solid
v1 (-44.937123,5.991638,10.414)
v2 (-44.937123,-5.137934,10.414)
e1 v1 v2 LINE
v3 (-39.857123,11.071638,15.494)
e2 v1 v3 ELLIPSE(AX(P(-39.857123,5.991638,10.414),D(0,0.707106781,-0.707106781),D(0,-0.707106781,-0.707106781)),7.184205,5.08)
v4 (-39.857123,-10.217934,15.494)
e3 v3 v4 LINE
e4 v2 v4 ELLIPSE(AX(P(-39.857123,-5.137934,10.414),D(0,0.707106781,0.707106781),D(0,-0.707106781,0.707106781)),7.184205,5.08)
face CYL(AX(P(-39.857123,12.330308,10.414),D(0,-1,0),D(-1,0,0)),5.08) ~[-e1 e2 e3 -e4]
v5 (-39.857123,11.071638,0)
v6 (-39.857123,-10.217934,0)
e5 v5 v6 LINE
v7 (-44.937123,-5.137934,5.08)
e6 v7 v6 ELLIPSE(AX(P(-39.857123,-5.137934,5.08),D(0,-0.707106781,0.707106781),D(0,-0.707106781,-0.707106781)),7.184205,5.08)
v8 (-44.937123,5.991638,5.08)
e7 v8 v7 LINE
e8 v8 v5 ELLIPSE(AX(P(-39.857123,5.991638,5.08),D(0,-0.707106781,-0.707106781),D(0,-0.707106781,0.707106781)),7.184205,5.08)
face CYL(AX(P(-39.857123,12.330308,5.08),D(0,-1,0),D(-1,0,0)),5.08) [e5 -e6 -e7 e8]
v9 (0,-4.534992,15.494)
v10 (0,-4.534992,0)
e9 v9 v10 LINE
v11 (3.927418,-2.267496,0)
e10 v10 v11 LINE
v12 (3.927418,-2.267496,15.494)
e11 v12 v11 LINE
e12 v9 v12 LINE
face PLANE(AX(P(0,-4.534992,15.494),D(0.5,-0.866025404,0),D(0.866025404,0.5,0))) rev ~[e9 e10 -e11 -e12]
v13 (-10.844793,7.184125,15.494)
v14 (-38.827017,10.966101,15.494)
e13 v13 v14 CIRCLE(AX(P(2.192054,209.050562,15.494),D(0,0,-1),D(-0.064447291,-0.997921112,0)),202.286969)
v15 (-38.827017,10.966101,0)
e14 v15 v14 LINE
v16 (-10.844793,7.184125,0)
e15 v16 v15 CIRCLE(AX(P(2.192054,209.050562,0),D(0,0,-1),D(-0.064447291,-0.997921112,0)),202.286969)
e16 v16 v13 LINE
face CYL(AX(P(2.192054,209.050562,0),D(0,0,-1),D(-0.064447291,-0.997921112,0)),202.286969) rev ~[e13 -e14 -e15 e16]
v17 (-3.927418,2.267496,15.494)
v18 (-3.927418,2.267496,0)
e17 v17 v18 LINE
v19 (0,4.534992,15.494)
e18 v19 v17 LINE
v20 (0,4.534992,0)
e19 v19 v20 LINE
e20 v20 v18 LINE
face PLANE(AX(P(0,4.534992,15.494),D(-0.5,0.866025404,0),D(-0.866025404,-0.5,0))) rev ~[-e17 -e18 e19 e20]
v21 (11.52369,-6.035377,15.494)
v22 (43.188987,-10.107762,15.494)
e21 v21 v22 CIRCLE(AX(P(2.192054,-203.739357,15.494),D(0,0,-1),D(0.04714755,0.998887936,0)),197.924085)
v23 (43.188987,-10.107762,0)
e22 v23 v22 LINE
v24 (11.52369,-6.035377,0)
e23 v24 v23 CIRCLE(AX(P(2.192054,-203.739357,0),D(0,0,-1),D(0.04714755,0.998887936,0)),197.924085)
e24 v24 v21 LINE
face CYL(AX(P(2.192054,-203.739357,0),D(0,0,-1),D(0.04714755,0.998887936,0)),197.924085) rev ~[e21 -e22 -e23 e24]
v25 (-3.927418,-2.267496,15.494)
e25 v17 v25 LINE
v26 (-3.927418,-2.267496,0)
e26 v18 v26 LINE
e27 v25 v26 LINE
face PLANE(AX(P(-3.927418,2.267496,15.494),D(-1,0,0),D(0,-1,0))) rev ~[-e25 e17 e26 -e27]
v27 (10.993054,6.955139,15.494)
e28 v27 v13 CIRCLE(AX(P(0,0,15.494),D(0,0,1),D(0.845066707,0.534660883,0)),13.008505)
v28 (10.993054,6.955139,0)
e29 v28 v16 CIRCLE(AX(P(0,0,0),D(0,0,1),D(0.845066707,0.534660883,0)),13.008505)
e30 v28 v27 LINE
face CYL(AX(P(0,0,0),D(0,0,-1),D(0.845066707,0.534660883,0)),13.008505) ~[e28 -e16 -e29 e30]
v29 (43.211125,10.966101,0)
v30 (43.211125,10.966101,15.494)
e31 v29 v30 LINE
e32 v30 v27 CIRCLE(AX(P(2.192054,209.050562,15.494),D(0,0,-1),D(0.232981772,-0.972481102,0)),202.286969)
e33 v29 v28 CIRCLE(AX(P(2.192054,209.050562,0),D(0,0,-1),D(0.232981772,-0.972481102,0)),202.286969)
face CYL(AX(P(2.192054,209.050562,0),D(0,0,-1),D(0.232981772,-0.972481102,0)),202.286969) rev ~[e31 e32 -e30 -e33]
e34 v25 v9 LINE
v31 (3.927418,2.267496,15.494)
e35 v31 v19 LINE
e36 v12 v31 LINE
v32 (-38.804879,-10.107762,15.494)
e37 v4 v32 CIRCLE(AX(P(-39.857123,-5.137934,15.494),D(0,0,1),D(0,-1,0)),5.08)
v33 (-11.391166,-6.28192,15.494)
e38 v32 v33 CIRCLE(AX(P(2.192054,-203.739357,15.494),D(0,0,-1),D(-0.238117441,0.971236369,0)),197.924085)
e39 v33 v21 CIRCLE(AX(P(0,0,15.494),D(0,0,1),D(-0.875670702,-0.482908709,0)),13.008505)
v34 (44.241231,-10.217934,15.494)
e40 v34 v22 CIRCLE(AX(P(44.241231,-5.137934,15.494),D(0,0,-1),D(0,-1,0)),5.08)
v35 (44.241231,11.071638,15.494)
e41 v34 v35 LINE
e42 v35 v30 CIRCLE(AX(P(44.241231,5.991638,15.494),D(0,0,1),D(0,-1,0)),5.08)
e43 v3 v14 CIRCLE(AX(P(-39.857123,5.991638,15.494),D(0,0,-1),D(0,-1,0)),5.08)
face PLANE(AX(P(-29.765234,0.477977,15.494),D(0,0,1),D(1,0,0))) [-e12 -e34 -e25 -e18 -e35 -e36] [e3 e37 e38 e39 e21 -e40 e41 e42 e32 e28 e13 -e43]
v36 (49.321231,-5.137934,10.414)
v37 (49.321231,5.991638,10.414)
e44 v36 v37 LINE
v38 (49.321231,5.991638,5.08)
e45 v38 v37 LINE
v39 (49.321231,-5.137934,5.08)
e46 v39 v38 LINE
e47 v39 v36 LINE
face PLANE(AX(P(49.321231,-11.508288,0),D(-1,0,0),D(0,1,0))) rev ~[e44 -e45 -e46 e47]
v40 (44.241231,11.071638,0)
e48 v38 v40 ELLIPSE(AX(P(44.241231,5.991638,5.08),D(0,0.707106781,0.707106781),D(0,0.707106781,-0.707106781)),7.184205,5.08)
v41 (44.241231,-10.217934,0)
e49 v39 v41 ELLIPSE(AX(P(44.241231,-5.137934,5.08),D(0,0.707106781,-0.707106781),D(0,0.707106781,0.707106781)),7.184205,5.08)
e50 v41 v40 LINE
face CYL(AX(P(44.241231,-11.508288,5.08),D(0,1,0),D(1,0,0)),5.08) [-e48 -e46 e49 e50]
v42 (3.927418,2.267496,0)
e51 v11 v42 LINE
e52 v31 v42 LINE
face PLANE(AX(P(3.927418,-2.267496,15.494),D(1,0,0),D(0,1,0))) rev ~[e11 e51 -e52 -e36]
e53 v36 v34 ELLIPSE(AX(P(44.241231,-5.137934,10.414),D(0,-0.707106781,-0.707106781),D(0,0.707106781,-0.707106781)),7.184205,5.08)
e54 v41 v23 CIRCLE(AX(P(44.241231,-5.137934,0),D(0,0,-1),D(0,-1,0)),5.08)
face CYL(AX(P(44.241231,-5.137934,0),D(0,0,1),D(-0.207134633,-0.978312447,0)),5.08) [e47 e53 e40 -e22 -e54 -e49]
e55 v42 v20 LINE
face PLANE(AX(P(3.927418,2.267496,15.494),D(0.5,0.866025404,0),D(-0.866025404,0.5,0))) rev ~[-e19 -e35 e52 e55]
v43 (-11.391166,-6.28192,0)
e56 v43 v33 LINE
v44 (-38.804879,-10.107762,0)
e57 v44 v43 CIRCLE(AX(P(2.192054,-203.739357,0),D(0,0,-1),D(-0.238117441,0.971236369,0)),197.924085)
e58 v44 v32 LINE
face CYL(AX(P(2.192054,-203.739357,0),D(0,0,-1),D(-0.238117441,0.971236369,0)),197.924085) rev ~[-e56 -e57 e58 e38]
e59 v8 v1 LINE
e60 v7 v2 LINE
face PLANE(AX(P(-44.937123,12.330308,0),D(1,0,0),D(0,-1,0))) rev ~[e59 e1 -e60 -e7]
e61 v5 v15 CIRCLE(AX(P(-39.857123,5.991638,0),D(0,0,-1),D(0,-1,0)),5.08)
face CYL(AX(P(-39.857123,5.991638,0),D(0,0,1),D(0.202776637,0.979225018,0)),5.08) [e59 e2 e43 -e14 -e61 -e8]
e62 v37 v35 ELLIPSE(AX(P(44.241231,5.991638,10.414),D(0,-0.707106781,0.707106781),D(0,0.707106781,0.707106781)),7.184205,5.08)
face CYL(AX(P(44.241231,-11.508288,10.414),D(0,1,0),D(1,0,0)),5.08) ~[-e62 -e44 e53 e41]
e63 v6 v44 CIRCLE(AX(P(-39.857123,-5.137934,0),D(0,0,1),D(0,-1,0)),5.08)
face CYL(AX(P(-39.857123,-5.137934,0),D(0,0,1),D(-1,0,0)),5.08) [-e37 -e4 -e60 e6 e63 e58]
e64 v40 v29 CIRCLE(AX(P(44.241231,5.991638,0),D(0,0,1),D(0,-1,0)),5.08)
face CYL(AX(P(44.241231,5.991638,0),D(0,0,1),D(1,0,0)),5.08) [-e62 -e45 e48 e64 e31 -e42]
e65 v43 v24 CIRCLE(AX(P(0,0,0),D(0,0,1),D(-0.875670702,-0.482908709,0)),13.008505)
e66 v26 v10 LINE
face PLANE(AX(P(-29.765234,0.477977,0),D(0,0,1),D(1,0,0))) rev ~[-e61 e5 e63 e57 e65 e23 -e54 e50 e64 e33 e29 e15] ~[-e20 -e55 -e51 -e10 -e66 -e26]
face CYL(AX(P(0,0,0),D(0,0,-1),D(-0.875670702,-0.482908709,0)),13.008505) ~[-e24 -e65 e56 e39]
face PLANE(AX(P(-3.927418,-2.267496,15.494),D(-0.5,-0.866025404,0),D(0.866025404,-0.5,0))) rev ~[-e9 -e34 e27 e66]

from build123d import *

# Parameters (mm, degrees)
F1_DEPTH = 15.494
F2_R     = 5.08
F4_DEPTH = 15.495


# Not quite as in the source:
# - a feature names something its author has since deleted; it is built from what else it names


with BuildPart() as f1:
    # F0 (on Top) → F1 (new body)
    with BuildSketch(Plane.XY):
        with BuildLine():
            ThreePointArc((-10.8447933041, 7.1841250258), (-28.0007995808, 9.0295397064), (-44.9371226132, 12.3303076252))
            Line((-44.9371226132, 12.3303076252), (-44.9371226132, -11.5082878619))
            ThreePointArc((-44.9371226132, -11.5082878619), (-28.2764136106, -8.174493828), (-11.391166434, -6.2819202055))
            ThreePointArc((-11.391166434, -6.2819202055), (-12.9978101968, 0.5273748986), (-10.8447933041, 7.1841250258))
        make_face()
        with BuildLine():
            ThreePointArc((10.9930542238, 6.9551386059), (0.1363965549, 13.007789596), (-10.8447933041, 7.1841250258))
            ThreePointArc((-10.8447933041, 7.1841250258), (0.0710380129, 6.7747130853), (10.9930542238, 6.9551386059))
        make_face()
        with BuildLine():
            ThreePointArc((10.9930542238, 6.9551386059), (0.0710380129, 6.7747130853), (-10.8447933041, 7.1841250258))
            ThreePointArc((-10.8447933041, 7.1841250258), (-12.9978101968, 0.5273748986), (-11.391166434, -6.2819202055))
            ThreePointArc((-11.391166434, -6.2819202055), (0.0626903929, -5.8267272063), (11.5236895742, -6.035376773))
            ThreePointArc((11.5236895742, -6.035376773), (12.6318479257, -3.1076698953), (13.0085046871, 0))
            ThreePointArc((13.0085046871, 0), (12.4944866159, 3.6206350823), (10.9930542238, 6.9551386059))
        make_face()
        with BuildLine():
            ThreePointArc((11.5236895742, -6.035376773), (0.0626903929, -5.8267272063), (-11.391166434, -6.2819202055))
            ThreePointArc((-11.391166434, -6.2819202055), (0.1399518192, -13.0077518305), (11.5236895742, -6.035376773))
        make_face()
        with BuildLine():
            ThreePointArc((49.3212305009, 12.3303076252), (30.2859906696, 8.7239574701), (10.9930542238, 6.9551386059))
            ThreePointArc((10.9930542238, 6.9551386059), (12.4944866159, 3.6206350823), (13.0085046871, 0))
            ThreePointArc((13.0085046871, 0), (12.6318479257, -3.1076698953), (11.5236895742, -6.035376773))
            ThreePointArc((11.5236895742, -6.035376773), (30.5547762597, -7.8580173956), (49.3212305009, -11.5082878619))
            Line((49.3212305009, -11.5082878619), (49.3212305009, 12.3303076252))
        make_face()
    extrude(amount=F1_DEPTH)

    # F2
    f2_edges = [f1.edges().sort_by_distance(p)[0] for p in [
        (-44.937123, 0.41101, 15.494),
        (49.321231, 0.41101, 15.494),
        (-44.937123, 0.41101, 0),
        (49.321231, 0.41101, 0),
        (-44.937123, 12.330308, 7.747),
        (-44.937123, -11.508288, 7.747),
        (49.321231, -11.508288, 7.747),
        (49.321231, 12.330308, 7.747),
    ]]
    fillet(f2_edges, radius=F2_R)

    # F3 (on face) → F4 (cut, through all)
    with BuildSketch(Plane.XY.offset(15.494)):
        Polygon((3.9274184965, -2.2674961262), (3.9274184965, 2.2674961262), (0, 4.5349922523), (-3.9274184965, 2.2674961262), (-3.9274184965, -2.2674961262), (0, -4.5349922523), align=None)
    extrude(amount=-F4_DEPTH, mode=Mode.SUBTRACT)


solid = f1.part
